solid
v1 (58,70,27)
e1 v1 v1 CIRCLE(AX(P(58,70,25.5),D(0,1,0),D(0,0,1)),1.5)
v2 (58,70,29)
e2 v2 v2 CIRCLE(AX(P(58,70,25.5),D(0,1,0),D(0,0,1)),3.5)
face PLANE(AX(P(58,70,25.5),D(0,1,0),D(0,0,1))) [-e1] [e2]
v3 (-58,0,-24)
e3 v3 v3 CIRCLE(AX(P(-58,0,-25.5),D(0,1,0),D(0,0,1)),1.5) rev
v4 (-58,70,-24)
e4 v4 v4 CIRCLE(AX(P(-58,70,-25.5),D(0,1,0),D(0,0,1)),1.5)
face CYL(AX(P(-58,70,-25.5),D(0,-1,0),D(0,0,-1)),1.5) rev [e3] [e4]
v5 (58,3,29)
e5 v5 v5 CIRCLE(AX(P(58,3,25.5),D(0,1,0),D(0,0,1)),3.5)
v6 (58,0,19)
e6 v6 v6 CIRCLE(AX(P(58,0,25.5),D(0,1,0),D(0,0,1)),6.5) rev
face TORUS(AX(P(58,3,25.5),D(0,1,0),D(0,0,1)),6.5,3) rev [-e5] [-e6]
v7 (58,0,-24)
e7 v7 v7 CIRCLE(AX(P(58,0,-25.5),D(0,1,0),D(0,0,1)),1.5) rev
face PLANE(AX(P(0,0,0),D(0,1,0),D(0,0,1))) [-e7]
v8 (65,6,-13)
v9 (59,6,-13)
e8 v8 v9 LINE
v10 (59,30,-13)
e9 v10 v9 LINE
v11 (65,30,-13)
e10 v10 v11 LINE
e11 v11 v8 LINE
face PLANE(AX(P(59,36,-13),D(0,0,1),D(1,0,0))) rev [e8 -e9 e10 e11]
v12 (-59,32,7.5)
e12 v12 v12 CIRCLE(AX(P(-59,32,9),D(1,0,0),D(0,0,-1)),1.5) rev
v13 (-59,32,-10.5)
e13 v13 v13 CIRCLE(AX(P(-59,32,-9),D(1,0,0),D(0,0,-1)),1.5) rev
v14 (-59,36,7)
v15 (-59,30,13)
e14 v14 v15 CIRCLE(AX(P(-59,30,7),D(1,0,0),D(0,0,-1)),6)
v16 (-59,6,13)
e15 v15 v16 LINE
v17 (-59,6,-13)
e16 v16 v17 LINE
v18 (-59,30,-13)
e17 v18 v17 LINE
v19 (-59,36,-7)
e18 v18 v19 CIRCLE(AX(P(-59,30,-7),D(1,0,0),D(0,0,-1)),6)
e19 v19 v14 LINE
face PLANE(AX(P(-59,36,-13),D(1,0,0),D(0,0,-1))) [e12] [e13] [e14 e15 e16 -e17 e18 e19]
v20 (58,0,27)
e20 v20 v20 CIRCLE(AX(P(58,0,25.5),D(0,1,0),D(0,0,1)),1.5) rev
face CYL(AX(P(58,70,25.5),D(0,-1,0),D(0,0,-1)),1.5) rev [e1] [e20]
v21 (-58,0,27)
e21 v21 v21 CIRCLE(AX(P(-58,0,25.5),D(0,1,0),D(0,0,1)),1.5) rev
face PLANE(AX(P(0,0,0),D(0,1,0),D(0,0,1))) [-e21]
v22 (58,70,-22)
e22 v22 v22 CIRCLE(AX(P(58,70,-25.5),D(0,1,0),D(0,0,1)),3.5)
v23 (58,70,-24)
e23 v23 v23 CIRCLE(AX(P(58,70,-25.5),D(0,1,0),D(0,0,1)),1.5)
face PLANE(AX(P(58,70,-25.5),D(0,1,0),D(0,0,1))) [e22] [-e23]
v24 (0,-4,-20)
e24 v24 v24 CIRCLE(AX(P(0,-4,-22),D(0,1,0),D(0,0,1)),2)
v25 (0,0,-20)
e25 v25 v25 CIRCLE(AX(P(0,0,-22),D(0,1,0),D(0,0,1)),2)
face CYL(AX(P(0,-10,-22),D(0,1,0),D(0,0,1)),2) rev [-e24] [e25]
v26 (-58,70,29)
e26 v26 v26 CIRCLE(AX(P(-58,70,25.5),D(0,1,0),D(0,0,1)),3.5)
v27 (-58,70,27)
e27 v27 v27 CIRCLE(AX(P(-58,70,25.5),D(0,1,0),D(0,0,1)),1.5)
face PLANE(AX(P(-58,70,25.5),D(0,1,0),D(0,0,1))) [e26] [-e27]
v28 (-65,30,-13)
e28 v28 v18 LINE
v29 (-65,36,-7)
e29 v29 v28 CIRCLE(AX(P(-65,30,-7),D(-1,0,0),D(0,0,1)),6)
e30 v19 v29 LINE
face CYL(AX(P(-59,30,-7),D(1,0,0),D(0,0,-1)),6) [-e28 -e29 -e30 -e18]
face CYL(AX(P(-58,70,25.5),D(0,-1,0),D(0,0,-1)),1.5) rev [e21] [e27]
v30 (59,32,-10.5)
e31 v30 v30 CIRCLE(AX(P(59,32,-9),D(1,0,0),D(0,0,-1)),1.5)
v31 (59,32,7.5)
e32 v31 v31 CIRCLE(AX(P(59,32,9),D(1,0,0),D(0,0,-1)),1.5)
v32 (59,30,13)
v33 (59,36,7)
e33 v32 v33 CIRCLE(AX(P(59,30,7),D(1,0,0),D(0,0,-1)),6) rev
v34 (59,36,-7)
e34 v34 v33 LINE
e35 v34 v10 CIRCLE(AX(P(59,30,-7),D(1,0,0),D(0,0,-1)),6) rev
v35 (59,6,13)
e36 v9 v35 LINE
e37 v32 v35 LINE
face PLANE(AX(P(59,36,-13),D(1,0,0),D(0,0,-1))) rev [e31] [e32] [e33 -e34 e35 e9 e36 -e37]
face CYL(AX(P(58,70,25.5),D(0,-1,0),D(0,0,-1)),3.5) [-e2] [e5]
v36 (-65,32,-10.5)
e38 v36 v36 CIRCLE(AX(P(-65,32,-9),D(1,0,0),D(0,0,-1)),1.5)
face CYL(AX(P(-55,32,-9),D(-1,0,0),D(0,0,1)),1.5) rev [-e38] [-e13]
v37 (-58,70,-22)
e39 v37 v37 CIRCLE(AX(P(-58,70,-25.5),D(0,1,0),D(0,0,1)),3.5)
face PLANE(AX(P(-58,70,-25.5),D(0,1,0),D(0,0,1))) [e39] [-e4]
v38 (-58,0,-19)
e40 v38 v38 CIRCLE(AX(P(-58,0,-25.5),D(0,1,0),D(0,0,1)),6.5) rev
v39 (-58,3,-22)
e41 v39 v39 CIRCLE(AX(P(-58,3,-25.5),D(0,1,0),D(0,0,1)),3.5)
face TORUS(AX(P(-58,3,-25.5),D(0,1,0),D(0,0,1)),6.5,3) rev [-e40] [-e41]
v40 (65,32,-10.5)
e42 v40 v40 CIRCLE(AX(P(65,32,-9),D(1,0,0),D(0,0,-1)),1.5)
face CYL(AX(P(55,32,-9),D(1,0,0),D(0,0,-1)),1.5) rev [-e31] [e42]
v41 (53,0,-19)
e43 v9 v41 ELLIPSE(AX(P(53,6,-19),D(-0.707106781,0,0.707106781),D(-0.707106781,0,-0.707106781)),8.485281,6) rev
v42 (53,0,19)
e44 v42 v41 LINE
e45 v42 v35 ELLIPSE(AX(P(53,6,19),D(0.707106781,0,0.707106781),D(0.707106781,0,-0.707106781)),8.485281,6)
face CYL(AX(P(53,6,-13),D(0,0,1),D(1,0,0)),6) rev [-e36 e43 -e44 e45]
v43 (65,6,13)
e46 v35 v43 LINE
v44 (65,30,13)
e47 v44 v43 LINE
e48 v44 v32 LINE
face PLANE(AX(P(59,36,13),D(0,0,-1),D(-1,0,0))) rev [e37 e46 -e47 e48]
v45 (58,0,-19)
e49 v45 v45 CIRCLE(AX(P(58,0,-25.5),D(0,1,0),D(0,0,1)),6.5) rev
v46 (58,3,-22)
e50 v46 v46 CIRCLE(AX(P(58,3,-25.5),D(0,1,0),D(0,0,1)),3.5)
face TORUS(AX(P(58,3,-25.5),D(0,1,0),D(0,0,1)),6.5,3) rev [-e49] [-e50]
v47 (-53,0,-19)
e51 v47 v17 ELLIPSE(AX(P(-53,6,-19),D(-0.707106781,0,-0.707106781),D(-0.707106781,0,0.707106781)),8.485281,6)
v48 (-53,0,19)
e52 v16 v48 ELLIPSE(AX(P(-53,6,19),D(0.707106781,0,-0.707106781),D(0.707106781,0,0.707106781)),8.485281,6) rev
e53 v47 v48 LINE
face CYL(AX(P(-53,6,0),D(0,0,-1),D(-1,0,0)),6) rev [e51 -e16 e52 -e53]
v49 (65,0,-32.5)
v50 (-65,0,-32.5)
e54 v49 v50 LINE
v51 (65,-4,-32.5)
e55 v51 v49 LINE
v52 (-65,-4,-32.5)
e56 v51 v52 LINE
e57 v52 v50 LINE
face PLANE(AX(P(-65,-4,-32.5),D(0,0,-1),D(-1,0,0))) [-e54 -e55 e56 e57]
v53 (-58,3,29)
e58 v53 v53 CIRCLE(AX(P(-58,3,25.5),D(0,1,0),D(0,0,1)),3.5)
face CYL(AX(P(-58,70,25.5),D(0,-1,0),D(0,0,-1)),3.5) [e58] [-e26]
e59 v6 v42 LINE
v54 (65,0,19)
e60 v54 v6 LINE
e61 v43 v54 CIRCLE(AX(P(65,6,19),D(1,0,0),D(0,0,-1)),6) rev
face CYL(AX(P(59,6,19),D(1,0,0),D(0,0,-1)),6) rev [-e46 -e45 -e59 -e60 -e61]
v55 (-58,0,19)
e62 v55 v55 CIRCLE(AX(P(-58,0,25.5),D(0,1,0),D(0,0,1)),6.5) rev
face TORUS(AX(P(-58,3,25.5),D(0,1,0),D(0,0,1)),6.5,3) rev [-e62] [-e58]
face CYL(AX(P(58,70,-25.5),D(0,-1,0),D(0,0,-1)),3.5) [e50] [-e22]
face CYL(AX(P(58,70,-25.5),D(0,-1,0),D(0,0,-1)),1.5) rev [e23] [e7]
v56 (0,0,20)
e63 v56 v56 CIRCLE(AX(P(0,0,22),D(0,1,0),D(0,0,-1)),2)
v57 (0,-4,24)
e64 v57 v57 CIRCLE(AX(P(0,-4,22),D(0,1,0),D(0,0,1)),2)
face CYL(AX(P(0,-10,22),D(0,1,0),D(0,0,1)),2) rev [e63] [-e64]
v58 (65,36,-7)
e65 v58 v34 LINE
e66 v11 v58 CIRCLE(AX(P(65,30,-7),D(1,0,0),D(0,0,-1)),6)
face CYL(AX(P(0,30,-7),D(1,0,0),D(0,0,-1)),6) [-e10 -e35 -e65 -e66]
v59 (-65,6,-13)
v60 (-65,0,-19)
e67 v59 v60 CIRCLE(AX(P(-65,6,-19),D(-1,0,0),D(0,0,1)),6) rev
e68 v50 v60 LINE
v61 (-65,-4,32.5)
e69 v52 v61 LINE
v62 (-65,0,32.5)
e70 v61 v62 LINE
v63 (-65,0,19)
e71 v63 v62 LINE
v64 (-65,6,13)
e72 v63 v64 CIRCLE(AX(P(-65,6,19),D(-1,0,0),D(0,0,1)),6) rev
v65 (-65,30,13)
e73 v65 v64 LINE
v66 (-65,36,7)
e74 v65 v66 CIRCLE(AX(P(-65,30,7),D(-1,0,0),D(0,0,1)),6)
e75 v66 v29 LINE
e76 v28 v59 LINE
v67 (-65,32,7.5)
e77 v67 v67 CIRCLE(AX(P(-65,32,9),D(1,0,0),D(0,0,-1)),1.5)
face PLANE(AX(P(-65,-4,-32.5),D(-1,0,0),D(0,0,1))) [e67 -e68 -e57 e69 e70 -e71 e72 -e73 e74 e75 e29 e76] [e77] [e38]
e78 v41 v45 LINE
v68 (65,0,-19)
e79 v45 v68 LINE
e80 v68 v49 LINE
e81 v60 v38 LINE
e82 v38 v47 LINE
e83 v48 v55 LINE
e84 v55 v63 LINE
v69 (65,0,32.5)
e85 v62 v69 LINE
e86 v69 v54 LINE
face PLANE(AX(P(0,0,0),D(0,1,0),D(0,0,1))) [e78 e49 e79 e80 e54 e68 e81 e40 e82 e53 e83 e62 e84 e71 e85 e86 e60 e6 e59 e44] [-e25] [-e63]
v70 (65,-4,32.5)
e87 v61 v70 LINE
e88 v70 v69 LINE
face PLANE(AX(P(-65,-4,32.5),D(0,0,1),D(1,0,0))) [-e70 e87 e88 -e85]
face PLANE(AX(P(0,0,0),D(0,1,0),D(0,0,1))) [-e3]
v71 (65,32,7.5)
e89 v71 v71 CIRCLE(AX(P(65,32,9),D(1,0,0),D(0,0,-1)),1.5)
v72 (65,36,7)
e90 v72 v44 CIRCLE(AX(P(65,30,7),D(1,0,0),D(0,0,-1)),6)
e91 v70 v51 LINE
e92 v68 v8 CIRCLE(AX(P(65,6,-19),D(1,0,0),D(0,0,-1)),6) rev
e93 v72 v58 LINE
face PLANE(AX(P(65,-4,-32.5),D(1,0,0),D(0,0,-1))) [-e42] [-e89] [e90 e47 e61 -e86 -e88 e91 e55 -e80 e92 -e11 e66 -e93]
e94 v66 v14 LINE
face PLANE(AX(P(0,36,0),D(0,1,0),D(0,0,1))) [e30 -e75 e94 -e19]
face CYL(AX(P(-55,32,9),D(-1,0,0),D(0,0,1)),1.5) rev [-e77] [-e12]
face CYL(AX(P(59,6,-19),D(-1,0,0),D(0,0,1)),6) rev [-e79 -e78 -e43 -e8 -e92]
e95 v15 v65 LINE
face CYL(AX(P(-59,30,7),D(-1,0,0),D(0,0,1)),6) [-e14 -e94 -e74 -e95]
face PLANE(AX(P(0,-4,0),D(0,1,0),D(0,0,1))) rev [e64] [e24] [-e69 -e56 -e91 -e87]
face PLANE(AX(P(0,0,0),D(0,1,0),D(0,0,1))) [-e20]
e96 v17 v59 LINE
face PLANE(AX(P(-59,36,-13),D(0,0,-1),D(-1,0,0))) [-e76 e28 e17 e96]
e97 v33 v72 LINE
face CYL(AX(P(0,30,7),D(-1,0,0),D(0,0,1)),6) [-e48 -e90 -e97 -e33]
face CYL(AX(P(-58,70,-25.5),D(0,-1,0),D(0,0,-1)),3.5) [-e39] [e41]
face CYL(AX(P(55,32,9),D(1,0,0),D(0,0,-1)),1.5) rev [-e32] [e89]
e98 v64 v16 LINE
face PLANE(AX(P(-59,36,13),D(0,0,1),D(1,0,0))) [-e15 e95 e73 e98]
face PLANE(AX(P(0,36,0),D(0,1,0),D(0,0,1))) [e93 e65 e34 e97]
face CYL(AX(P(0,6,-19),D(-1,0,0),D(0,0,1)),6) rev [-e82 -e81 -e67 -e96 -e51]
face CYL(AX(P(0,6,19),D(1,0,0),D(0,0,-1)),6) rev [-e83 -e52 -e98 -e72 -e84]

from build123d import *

# Parameters (mm, degrees)
SKETCH1_W            = 130
SKETCH1_H            = 65
BOSS_EXTRUDE1_DEPTH  = 4
SKETCH4_R            = 3.5
SKETCH4_R_2          = 1.5
BOSS_EXTRUDE3_DEPTH  = 70
SKETCH5_2_W          = 6
SKETCH5_2_H          = 26
BOSS_EXTRUDE5_DEPTH  = 36
SKETCH5_W            = 6
SKETCH5_H            = 26
BOSS_EXTRUDE4_DEPTH  = 36
SKETCH7_R            = 1.5
CUT_EXTRUDE2_DEPTH   = 10
FILLET1_R            = 6
FILLET1_OF_MIRROR1_R = 6
SKETCH10_R           = 2
CUT_EXTRUDE3_DEPTH   = 10
FILLET2_R            = 3


with BuildPart() as part:
    # Sketch1 → Boss-Extrude1 (new body)
    with BuildSketch(Plane(origin=(0, 0, 0), x_dir=(1, 0, 0), z_dir=(0, 1, 0))):
        Rectangle(SKETCH1_W, SKETCH1_H)
    extrude(amount=-BOSS_EXTRUDE1_DEPTH)

    # Sketch4 → Boss-Extrude3 (add)
    # profile 1 of 4: a face of its own
    with BuildSketch(Plane(origin=(0, 0, 0), x_dir=(1, 0, 0), z_dir=(0, 1, 0))):
        with Locations(Location((-58, 25.5, 0), (0, 0, 270))):
            Circle(SKETCH4_R)
        with Locations(Location((-58, 25.5, 0), (0, 0, 270))):
            Circle(SKETCH4_R_2, mode=Mode.SUBTRACT)
    # profile 2 of 4: a face of its own
    with BuildSketch(Plane(origin=(0, 0, 0), x_dir=(1, 0, 0), z_dir=(0, 1, 0))):
        with Locations(Location((58, 25.5, 0), (0, 0, 270))):
            Circle(SKETCH4_R)
        with Locations(Location((58, 25.5, 0), (0, 0, 270))):
            Circle(SKETCH4_R_2, mode=Mode.SUBTRACT)
    # profile 3 of 4: a face of its own
    with BuildSketch(Plane(origin=(0, 0, 0), x_dir=(1, 0, 0), z_dir=(0, 1, 0))):
        with Locations(Location((-58, -25.5, 0), (0, 0, 270))):
            Circle(SKETCH4_R)
        with Locations(Location((-58, -25.5, 0), (0, 0, 270))):
            Circle(SKETCH4_R_2, mode=Mode.SUBTRACT)
    # profile 4 of 4: a face of its own
    with BuildSketch(Plane(origin=(0, 0, 0), x_dir=(1, 0, 0), z_dir=(0, 1, 0))):
        with Locations(Location((58, -25.5, 0), (0, 0, 270))):
            Circle(SKETCH4_R)
        with Locations(Location((58, -25.5, 0), (0, 0, 270))):
            Circle(SKETCH4_R_2, mode=Mode.SUBTRACT)
    extrude(amount=BOSS_EXTRUDE3_DEPTH)

    # Sketch5<2> → Boss-Extrude5 (add)
    with BuildSketch(Plane(origin=(0, 0, 0), x_dir=(1, 0, 0), z_dir=(0, 1, 0))):
        with Locations((62, 0)):
            Rectangle(SKETCH5_2_W, SKETCH5_2_H)
    boss_extrude5 = extrude(amount=BOSS_EXTRUDE5_DEPTH)

    # Sketch5 → Boss-Extrude4 (add)
    with BuildSketch(Plane(origin=(0, 0, 0), x_dir=(1, 0, 0), z_dir=(0, 1, 0))):
        with Locations((62, 0)):
            Rectangle(SKETCH5_W, SKETCH5_H)
    extrude(amount=BOSS_EXTRUDE4_DEPTH)

    # Sketch7 → Cut-Extrude2 (cut)
    with BuildSketch(Plane(origin=(65, 0, 0), x_dir=(0, 0, -1), z_dir=(1, 0, 0))):
        with Locations((-9, 32)):
            Circle(SKETCH7_R)
        with Locations((9, 32)):
            Circle(SKETCH7_R)
    cut_extrude2 = extrude(amount=-CUT_EXTRUDE2_DEPTH, mode=Mode.SUBTRACT)

    # Fillet1
    fillet1_edges = [part.edges().sort_by_distance(p)[0] for p in [
        (62, 0, -13),
        (59, 0, 0),
        (62, 0, 13),
        (62, 36, -13),
        (62, 36, 13),
    ]]
    fillet(fillet1_edges, radius=FILLET1_R)

    # Mirror1: Boss-Extrude5, Cut-Extrude2 across plane
    add(boss_extrude5.mirror(Plane(origin=(0, 0, 0), x_dir=(0, 0, 1), z_dir=(1, 0, 0))))
    add(cut_extrude2.mirror(Plane(origin=(0, 0, 0), x_dir=(0, 0, 1), z_dir=(1, 0, 0))), mode=Mode.SUBTRACT)

    # Fillet1 of Mirror1
    fillet1_of_mirror1_edges = [part.edges().sort_by_distance(p)[0] for p in [
        (-62, 0, -13),
        (-59, 0, 0),
        (-62, 0, 13),
        (-62, 36, -13),
        (-62, 36, 13),
    ]]
    fillet(fillet1_of_mirror1_edges, radius=FILLET1_OF_MIRROR1_R)

    # Sketch10 → Cut-Extrude3 (cut)
    with BuildSketch(Plane(origin=(0, 0, 0), x_dir=(1, 0, 0), z_dir=(0, 1, 0))):
        with Locations(Location((0, 22, 0), (0, 0, 270))):
            Circle(SKETCH10_R)
        with Locations(Location((0, -22, 0), (0, 0, 270))):
            Circle(SKETCH10_R)
    extrude(amount=-CUT_EXTRUDE3_DEPTH, mode=Mode.SUBTRACT)

    # Fillet2
    fillet2_edges = [part.edges().sort_by_distance(p)[0] for p in [
        (-58, 0, -29),
        (58, 0, -29),
        (-58, 0, 22),
        (58, 0, 22),
    ]]
    fillet(fillet2_edges, radius=FILLET2_R - 0.0001)  # a hair under: the kernel refuses the full size


solid = part.part
